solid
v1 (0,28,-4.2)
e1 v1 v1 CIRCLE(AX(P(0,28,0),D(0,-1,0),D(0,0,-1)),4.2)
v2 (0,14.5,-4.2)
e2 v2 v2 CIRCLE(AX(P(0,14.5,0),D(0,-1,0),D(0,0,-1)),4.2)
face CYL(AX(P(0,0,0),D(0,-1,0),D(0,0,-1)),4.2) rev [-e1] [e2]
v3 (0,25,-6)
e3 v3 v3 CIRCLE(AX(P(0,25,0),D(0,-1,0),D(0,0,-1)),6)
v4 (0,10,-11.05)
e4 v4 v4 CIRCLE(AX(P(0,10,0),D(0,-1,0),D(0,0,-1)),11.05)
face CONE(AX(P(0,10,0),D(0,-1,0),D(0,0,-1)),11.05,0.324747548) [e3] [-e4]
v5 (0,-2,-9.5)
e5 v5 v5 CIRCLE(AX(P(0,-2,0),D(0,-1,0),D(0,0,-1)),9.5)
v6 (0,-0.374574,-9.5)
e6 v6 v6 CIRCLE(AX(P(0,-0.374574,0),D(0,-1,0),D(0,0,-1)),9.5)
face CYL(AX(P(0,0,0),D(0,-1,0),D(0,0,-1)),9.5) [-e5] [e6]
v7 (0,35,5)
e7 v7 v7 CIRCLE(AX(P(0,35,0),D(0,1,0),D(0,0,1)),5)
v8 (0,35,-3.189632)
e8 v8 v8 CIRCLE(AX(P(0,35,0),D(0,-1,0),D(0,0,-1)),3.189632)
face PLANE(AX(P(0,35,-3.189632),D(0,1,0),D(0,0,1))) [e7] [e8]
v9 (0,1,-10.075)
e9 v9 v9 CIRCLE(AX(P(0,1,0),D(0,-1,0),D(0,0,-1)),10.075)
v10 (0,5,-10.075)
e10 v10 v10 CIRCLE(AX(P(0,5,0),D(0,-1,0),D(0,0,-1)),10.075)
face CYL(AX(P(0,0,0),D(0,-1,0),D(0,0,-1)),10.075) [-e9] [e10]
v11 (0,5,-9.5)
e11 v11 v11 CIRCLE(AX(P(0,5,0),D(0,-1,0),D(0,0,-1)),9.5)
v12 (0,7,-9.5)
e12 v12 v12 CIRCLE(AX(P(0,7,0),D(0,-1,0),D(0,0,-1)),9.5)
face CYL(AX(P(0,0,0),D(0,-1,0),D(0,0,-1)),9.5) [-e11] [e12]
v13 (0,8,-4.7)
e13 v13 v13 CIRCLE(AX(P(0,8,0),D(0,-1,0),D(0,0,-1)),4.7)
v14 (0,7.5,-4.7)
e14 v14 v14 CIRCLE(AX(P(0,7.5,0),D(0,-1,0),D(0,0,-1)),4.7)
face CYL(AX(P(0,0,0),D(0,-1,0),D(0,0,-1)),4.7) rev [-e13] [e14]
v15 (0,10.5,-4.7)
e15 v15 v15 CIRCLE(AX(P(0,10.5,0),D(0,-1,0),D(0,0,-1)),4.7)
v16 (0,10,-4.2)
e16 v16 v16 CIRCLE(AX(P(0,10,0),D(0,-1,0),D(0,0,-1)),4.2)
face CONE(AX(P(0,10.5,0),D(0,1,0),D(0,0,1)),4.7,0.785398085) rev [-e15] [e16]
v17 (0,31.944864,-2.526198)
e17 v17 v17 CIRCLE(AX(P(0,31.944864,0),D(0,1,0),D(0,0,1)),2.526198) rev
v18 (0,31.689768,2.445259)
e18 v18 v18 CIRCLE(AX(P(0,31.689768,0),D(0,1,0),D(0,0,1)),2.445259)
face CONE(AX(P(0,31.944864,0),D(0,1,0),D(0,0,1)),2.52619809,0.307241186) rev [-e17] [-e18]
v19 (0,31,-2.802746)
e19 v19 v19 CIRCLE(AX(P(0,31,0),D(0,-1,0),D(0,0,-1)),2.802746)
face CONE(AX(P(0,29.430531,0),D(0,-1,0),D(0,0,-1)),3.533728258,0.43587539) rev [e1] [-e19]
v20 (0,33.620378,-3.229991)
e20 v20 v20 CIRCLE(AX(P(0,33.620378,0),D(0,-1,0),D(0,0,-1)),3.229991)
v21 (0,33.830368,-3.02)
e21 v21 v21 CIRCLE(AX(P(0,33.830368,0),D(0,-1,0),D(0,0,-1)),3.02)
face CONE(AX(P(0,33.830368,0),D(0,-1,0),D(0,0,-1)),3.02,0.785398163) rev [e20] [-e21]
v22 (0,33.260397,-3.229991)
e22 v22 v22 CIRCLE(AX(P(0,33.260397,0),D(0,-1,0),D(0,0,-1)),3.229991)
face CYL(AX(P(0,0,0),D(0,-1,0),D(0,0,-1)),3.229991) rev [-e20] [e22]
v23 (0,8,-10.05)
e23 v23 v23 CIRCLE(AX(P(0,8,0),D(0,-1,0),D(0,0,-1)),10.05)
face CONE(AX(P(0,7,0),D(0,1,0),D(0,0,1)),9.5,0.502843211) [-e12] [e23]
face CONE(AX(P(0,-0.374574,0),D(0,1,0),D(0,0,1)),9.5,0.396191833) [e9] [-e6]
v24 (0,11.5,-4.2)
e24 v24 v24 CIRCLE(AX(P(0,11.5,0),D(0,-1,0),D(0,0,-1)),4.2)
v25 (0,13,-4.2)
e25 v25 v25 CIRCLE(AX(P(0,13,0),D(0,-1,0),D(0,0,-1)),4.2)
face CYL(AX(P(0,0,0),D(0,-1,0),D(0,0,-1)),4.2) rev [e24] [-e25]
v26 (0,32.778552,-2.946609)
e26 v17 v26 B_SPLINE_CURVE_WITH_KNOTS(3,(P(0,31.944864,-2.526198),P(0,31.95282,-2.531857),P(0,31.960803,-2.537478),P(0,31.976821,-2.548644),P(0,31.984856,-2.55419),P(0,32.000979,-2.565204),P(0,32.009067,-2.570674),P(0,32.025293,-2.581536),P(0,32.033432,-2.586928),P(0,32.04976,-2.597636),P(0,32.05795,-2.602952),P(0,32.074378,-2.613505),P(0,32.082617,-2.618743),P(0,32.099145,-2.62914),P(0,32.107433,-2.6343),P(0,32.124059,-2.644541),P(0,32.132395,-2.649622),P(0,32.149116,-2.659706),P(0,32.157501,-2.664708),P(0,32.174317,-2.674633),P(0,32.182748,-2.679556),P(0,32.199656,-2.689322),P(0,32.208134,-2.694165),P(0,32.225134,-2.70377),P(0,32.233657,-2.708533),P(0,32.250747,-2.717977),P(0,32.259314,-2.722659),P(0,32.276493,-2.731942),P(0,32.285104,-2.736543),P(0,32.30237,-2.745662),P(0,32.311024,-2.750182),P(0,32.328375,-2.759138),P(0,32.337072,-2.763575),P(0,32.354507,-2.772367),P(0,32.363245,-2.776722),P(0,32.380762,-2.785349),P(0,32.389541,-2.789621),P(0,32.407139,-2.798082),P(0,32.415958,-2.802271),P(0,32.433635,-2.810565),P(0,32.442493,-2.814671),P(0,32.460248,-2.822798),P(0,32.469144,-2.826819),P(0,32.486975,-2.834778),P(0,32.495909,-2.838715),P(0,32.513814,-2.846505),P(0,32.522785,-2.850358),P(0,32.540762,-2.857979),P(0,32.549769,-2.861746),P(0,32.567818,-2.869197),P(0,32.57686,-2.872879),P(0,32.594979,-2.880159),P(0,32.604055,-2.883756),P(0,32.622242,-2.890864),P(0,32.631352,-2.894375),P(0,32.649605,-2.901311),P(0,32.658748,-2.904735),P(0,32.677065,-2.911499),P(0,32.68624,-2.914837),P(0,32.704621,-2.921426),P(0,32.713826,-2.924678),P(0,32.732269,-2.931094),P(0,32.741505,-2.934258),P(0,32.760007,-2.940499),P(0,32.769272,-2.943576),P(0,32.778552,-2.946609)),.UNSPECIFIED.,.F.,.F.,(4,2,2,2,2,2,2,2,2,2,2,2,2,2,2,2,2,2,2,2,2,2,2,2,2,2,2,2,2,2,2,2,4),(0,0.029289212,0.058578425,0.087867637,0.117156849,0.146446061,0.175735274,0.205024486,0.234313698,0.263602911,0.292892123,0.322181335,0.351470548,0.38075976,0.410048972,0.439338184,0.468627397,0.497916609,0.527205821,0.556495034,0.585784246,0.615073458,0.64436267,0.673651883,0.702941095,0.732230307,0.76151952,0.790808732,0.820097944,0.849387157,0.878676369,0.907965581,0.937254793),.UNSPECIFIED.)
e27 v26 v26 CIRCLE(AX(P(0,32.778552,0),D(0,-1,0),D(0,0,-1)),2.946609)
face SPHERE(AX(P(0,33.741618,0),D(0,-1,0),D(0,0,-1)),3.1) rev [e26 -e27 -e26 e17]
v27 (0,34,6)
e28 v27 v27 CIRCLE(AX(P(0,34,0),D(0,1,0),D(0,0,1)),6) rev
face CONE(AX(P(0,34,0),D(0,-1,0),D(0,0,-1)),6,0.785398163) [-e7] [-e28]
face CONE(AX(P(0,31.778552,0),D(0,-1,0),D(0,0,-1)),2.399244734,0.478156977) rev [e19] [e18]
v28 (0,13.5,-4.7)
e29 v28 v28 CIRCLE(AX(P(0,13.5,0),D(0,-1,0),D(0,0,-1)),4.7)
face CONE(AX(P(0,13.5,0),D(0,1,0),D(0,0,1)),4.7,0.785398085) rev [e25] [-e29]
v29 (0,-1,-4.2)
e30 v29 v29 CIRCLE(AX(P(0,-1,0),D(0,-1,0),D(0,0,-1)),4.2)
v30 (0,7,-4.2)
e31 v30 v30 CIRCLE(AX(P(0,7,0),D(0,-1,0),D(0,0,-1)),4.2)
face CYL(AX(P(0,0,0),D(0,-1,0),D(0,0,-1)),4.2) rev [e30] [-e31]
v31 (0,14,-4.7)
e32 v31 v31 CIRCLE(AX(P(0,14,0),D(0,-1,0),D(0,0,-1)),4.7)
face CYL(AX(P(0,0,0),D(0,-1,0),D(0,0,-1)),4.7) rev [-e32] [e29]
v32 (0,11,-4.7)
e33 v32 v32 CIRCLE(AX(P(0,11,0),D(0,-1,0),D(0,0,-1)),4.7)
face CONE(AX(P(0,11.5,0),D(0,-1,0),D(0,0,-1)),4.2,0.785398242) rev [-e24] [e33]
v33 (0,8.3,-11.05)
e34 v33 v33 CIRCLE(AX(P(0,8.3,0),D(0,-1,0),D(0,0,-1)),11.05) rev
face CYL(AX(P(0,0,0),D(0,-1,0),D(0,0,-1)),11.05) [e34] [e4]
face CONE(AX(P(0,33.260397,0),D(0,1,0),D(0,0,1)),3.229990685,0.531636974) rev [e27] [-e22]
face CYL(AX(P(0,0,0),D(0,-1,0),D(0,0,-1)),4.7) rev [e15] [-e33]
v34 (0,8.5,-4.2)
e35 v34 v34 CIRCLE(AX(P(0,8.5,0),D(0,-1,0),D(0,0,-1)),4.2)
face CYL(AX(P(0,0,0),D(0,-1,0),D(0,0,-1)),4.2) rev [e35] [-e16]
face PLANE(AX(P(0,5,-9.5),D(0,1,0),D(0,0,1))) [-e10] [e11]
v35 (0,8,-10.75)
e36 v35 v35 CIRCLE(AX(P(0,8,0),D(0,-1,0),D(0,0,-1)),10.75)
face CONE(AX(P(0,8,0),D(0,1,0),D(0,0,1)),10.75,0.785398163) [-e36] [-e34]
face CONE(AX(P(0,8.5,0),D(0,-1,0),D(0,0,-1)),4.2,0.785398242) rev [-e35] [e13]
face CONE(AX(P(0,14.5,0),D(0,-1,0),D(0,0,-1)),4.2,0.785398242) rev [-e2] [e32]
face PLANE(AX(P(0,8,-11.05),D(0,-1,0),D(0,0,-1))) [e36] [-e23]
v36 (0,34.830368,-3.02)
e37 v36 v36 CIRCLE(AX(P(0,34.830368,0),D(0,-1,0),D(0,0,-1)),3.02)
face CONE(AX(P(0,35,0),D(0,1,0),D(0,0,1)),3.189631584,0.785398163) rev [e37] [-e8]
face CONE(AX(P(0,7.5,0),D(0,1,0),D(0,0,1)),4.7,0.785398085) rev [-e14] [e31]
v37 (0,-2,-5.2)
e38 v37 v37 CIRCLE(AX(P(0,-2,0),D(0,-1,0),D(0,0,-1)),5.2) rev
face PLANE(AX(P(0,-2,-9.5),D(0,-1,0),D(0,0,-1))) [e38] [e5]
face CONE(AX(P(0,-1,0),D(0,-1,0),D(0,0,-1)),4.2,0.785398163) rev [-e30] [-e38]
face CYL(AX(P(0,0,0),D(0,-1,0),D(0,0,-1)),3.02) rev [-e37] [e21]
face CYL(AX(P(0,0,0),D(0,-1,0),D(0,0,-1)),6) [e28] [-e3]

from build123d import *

# Parameters (mm, degrees)
CHAMFER_1_SIZE = 1
CHAMFER_2_SIZE = 0.1
CHAMFER_3_SIZE = 0.3


with BuildPart() as part:
    # 스케치1 → 회전1 (revolve)
    with BuildSketch(Plane(origin=(0, 0, 0), x_dir=(0, 0, -1), z_dir=(1, 0, 0))):
        with BuildLine():
            Line((4.2, 0), (4.2, 1))
            Line((4.2, 1), (4.2, 7))
            Line((4.2, 7), (4.7, 7.500000078))
            Line((4.7, 7.500000078), (4.7, 8.000000078))
            Line((4.7, 8.000000078), (4.2, 8.5))
            Line((4.2, 8.5), (4.2, 10))
            Line((4.2, 10), (4.7, 10.500000078))
            Line((4.7, 10.500000078), (4.7, 11.000000078))
            Line((4.7, 11.000000078), (4.2, 11.5))
            Line((4.2, 11.5), (4.2, 13))
            Line((4.2, 13), (4.7, 13.500000078))
            Line((4.7, 13.500000078), (4.7, 14.000000078))
            Line((4.7, 14.000000078), (4.2, 14.5))
            Line((4.2, 14.5), (4.2, 28))
            Line((4.2, 28), (3.533728258, 29.430530536))
            Line((3.533728258, 29.430530536), (2.802745502, 31))
            Line((2.802745502, 31), (2.399244734, 31.778552392))
            ThreePointArc((2.399244734, 31.778552392), (2.719290067, 32.253174869), (2.946609162, 32.778552392))
            Line((2.946609162, 32.778552392), (3.229990685, 33.260397004))
            Line((3.229990685, 33.260397004), (3.229990685, 33.62037773))
            Line((3.229990685, 33.62037773), (3.02, 33.830368416))
            Line((3.02, 33.830368416), (3.02, 34.830368416))
            Line((3.02, 34.830368416), (3.189631584, 35))
            Line((3.189631584, 35), (6, 35))
            Line((6, 35), (6, 25))
            Line((6, 25), (11.05, 10))
            Line((11.05, 10), (11.05, 8))
            Line((11.05, 8), (10.05, 8))
            Line((10.05, 8), (9.5, 7))
            Line((9.5, 7), (9.5, 5))
            Line((9.5, 5), (10.075, 5))
            Line((10.075, 5), (10.075, 1))
            Line((10.075, 1), (9.5, -0.374573668))
            Line((9.5, -0.374573668), (9.5, -2))
            Line((9.5, -2), (4.2, -2))
            Line((4.2, -2), (4.2, 0))
        make_face()
    revolve(axis=Axis((0, 0, 0), (0, 1, 0)))

    # 모따기1
    chamfer_1_edges = [part.edges().sort_by_distance(p)[0] for p in [
        (0, 35, 6),
        (0, -2, 4.2),
    ]]
    chamfer(chamfer_1_edges, length=CHAMFER_1_SIZE)

    # 모따기2
    # the kernel refuses this chamfer: 0.191354542, 0.1 mm, written as the material it takes off along each edge
    with BuildSketch(Plane(origin=(0, 31.778552392, 0), x_dir=(0, 0, -1), z_dir=(1, 0, 0))) as chamfer_2_piece_1:
        with BuildLine():
            Line((2.52619809, 0.166311611), (2.399244734 + CHAMFER_2_SIZE * 0.460143640426, -CHAMFER_2_SIZE * 0.887844485355))
            Line((2.399244734 + CHAMFER_2_SIZE * 0.460143640426, -CHAMFER_2_SIZE * 0.887844485355), (2.399244734, 0))
            ThreePointArc((2.399244734, 0), (2.466310937, 0.08495162), (2.52619809, 0.166311611))
        make_face()
    revolve(axis=Axis((0, 31.778552392, 0), (0, 1, 0)), mode=Mode.SUBTRACT)

    # 모따기3
    chamfer_3_edges = [part.edges().sort_by_distance(p)[0] for p in [
        (0, 8, 11.05),
    ]]
    chamfer(chamfer_3_edges, length=CHAMFER_3_SIZE)


solid = part.part
